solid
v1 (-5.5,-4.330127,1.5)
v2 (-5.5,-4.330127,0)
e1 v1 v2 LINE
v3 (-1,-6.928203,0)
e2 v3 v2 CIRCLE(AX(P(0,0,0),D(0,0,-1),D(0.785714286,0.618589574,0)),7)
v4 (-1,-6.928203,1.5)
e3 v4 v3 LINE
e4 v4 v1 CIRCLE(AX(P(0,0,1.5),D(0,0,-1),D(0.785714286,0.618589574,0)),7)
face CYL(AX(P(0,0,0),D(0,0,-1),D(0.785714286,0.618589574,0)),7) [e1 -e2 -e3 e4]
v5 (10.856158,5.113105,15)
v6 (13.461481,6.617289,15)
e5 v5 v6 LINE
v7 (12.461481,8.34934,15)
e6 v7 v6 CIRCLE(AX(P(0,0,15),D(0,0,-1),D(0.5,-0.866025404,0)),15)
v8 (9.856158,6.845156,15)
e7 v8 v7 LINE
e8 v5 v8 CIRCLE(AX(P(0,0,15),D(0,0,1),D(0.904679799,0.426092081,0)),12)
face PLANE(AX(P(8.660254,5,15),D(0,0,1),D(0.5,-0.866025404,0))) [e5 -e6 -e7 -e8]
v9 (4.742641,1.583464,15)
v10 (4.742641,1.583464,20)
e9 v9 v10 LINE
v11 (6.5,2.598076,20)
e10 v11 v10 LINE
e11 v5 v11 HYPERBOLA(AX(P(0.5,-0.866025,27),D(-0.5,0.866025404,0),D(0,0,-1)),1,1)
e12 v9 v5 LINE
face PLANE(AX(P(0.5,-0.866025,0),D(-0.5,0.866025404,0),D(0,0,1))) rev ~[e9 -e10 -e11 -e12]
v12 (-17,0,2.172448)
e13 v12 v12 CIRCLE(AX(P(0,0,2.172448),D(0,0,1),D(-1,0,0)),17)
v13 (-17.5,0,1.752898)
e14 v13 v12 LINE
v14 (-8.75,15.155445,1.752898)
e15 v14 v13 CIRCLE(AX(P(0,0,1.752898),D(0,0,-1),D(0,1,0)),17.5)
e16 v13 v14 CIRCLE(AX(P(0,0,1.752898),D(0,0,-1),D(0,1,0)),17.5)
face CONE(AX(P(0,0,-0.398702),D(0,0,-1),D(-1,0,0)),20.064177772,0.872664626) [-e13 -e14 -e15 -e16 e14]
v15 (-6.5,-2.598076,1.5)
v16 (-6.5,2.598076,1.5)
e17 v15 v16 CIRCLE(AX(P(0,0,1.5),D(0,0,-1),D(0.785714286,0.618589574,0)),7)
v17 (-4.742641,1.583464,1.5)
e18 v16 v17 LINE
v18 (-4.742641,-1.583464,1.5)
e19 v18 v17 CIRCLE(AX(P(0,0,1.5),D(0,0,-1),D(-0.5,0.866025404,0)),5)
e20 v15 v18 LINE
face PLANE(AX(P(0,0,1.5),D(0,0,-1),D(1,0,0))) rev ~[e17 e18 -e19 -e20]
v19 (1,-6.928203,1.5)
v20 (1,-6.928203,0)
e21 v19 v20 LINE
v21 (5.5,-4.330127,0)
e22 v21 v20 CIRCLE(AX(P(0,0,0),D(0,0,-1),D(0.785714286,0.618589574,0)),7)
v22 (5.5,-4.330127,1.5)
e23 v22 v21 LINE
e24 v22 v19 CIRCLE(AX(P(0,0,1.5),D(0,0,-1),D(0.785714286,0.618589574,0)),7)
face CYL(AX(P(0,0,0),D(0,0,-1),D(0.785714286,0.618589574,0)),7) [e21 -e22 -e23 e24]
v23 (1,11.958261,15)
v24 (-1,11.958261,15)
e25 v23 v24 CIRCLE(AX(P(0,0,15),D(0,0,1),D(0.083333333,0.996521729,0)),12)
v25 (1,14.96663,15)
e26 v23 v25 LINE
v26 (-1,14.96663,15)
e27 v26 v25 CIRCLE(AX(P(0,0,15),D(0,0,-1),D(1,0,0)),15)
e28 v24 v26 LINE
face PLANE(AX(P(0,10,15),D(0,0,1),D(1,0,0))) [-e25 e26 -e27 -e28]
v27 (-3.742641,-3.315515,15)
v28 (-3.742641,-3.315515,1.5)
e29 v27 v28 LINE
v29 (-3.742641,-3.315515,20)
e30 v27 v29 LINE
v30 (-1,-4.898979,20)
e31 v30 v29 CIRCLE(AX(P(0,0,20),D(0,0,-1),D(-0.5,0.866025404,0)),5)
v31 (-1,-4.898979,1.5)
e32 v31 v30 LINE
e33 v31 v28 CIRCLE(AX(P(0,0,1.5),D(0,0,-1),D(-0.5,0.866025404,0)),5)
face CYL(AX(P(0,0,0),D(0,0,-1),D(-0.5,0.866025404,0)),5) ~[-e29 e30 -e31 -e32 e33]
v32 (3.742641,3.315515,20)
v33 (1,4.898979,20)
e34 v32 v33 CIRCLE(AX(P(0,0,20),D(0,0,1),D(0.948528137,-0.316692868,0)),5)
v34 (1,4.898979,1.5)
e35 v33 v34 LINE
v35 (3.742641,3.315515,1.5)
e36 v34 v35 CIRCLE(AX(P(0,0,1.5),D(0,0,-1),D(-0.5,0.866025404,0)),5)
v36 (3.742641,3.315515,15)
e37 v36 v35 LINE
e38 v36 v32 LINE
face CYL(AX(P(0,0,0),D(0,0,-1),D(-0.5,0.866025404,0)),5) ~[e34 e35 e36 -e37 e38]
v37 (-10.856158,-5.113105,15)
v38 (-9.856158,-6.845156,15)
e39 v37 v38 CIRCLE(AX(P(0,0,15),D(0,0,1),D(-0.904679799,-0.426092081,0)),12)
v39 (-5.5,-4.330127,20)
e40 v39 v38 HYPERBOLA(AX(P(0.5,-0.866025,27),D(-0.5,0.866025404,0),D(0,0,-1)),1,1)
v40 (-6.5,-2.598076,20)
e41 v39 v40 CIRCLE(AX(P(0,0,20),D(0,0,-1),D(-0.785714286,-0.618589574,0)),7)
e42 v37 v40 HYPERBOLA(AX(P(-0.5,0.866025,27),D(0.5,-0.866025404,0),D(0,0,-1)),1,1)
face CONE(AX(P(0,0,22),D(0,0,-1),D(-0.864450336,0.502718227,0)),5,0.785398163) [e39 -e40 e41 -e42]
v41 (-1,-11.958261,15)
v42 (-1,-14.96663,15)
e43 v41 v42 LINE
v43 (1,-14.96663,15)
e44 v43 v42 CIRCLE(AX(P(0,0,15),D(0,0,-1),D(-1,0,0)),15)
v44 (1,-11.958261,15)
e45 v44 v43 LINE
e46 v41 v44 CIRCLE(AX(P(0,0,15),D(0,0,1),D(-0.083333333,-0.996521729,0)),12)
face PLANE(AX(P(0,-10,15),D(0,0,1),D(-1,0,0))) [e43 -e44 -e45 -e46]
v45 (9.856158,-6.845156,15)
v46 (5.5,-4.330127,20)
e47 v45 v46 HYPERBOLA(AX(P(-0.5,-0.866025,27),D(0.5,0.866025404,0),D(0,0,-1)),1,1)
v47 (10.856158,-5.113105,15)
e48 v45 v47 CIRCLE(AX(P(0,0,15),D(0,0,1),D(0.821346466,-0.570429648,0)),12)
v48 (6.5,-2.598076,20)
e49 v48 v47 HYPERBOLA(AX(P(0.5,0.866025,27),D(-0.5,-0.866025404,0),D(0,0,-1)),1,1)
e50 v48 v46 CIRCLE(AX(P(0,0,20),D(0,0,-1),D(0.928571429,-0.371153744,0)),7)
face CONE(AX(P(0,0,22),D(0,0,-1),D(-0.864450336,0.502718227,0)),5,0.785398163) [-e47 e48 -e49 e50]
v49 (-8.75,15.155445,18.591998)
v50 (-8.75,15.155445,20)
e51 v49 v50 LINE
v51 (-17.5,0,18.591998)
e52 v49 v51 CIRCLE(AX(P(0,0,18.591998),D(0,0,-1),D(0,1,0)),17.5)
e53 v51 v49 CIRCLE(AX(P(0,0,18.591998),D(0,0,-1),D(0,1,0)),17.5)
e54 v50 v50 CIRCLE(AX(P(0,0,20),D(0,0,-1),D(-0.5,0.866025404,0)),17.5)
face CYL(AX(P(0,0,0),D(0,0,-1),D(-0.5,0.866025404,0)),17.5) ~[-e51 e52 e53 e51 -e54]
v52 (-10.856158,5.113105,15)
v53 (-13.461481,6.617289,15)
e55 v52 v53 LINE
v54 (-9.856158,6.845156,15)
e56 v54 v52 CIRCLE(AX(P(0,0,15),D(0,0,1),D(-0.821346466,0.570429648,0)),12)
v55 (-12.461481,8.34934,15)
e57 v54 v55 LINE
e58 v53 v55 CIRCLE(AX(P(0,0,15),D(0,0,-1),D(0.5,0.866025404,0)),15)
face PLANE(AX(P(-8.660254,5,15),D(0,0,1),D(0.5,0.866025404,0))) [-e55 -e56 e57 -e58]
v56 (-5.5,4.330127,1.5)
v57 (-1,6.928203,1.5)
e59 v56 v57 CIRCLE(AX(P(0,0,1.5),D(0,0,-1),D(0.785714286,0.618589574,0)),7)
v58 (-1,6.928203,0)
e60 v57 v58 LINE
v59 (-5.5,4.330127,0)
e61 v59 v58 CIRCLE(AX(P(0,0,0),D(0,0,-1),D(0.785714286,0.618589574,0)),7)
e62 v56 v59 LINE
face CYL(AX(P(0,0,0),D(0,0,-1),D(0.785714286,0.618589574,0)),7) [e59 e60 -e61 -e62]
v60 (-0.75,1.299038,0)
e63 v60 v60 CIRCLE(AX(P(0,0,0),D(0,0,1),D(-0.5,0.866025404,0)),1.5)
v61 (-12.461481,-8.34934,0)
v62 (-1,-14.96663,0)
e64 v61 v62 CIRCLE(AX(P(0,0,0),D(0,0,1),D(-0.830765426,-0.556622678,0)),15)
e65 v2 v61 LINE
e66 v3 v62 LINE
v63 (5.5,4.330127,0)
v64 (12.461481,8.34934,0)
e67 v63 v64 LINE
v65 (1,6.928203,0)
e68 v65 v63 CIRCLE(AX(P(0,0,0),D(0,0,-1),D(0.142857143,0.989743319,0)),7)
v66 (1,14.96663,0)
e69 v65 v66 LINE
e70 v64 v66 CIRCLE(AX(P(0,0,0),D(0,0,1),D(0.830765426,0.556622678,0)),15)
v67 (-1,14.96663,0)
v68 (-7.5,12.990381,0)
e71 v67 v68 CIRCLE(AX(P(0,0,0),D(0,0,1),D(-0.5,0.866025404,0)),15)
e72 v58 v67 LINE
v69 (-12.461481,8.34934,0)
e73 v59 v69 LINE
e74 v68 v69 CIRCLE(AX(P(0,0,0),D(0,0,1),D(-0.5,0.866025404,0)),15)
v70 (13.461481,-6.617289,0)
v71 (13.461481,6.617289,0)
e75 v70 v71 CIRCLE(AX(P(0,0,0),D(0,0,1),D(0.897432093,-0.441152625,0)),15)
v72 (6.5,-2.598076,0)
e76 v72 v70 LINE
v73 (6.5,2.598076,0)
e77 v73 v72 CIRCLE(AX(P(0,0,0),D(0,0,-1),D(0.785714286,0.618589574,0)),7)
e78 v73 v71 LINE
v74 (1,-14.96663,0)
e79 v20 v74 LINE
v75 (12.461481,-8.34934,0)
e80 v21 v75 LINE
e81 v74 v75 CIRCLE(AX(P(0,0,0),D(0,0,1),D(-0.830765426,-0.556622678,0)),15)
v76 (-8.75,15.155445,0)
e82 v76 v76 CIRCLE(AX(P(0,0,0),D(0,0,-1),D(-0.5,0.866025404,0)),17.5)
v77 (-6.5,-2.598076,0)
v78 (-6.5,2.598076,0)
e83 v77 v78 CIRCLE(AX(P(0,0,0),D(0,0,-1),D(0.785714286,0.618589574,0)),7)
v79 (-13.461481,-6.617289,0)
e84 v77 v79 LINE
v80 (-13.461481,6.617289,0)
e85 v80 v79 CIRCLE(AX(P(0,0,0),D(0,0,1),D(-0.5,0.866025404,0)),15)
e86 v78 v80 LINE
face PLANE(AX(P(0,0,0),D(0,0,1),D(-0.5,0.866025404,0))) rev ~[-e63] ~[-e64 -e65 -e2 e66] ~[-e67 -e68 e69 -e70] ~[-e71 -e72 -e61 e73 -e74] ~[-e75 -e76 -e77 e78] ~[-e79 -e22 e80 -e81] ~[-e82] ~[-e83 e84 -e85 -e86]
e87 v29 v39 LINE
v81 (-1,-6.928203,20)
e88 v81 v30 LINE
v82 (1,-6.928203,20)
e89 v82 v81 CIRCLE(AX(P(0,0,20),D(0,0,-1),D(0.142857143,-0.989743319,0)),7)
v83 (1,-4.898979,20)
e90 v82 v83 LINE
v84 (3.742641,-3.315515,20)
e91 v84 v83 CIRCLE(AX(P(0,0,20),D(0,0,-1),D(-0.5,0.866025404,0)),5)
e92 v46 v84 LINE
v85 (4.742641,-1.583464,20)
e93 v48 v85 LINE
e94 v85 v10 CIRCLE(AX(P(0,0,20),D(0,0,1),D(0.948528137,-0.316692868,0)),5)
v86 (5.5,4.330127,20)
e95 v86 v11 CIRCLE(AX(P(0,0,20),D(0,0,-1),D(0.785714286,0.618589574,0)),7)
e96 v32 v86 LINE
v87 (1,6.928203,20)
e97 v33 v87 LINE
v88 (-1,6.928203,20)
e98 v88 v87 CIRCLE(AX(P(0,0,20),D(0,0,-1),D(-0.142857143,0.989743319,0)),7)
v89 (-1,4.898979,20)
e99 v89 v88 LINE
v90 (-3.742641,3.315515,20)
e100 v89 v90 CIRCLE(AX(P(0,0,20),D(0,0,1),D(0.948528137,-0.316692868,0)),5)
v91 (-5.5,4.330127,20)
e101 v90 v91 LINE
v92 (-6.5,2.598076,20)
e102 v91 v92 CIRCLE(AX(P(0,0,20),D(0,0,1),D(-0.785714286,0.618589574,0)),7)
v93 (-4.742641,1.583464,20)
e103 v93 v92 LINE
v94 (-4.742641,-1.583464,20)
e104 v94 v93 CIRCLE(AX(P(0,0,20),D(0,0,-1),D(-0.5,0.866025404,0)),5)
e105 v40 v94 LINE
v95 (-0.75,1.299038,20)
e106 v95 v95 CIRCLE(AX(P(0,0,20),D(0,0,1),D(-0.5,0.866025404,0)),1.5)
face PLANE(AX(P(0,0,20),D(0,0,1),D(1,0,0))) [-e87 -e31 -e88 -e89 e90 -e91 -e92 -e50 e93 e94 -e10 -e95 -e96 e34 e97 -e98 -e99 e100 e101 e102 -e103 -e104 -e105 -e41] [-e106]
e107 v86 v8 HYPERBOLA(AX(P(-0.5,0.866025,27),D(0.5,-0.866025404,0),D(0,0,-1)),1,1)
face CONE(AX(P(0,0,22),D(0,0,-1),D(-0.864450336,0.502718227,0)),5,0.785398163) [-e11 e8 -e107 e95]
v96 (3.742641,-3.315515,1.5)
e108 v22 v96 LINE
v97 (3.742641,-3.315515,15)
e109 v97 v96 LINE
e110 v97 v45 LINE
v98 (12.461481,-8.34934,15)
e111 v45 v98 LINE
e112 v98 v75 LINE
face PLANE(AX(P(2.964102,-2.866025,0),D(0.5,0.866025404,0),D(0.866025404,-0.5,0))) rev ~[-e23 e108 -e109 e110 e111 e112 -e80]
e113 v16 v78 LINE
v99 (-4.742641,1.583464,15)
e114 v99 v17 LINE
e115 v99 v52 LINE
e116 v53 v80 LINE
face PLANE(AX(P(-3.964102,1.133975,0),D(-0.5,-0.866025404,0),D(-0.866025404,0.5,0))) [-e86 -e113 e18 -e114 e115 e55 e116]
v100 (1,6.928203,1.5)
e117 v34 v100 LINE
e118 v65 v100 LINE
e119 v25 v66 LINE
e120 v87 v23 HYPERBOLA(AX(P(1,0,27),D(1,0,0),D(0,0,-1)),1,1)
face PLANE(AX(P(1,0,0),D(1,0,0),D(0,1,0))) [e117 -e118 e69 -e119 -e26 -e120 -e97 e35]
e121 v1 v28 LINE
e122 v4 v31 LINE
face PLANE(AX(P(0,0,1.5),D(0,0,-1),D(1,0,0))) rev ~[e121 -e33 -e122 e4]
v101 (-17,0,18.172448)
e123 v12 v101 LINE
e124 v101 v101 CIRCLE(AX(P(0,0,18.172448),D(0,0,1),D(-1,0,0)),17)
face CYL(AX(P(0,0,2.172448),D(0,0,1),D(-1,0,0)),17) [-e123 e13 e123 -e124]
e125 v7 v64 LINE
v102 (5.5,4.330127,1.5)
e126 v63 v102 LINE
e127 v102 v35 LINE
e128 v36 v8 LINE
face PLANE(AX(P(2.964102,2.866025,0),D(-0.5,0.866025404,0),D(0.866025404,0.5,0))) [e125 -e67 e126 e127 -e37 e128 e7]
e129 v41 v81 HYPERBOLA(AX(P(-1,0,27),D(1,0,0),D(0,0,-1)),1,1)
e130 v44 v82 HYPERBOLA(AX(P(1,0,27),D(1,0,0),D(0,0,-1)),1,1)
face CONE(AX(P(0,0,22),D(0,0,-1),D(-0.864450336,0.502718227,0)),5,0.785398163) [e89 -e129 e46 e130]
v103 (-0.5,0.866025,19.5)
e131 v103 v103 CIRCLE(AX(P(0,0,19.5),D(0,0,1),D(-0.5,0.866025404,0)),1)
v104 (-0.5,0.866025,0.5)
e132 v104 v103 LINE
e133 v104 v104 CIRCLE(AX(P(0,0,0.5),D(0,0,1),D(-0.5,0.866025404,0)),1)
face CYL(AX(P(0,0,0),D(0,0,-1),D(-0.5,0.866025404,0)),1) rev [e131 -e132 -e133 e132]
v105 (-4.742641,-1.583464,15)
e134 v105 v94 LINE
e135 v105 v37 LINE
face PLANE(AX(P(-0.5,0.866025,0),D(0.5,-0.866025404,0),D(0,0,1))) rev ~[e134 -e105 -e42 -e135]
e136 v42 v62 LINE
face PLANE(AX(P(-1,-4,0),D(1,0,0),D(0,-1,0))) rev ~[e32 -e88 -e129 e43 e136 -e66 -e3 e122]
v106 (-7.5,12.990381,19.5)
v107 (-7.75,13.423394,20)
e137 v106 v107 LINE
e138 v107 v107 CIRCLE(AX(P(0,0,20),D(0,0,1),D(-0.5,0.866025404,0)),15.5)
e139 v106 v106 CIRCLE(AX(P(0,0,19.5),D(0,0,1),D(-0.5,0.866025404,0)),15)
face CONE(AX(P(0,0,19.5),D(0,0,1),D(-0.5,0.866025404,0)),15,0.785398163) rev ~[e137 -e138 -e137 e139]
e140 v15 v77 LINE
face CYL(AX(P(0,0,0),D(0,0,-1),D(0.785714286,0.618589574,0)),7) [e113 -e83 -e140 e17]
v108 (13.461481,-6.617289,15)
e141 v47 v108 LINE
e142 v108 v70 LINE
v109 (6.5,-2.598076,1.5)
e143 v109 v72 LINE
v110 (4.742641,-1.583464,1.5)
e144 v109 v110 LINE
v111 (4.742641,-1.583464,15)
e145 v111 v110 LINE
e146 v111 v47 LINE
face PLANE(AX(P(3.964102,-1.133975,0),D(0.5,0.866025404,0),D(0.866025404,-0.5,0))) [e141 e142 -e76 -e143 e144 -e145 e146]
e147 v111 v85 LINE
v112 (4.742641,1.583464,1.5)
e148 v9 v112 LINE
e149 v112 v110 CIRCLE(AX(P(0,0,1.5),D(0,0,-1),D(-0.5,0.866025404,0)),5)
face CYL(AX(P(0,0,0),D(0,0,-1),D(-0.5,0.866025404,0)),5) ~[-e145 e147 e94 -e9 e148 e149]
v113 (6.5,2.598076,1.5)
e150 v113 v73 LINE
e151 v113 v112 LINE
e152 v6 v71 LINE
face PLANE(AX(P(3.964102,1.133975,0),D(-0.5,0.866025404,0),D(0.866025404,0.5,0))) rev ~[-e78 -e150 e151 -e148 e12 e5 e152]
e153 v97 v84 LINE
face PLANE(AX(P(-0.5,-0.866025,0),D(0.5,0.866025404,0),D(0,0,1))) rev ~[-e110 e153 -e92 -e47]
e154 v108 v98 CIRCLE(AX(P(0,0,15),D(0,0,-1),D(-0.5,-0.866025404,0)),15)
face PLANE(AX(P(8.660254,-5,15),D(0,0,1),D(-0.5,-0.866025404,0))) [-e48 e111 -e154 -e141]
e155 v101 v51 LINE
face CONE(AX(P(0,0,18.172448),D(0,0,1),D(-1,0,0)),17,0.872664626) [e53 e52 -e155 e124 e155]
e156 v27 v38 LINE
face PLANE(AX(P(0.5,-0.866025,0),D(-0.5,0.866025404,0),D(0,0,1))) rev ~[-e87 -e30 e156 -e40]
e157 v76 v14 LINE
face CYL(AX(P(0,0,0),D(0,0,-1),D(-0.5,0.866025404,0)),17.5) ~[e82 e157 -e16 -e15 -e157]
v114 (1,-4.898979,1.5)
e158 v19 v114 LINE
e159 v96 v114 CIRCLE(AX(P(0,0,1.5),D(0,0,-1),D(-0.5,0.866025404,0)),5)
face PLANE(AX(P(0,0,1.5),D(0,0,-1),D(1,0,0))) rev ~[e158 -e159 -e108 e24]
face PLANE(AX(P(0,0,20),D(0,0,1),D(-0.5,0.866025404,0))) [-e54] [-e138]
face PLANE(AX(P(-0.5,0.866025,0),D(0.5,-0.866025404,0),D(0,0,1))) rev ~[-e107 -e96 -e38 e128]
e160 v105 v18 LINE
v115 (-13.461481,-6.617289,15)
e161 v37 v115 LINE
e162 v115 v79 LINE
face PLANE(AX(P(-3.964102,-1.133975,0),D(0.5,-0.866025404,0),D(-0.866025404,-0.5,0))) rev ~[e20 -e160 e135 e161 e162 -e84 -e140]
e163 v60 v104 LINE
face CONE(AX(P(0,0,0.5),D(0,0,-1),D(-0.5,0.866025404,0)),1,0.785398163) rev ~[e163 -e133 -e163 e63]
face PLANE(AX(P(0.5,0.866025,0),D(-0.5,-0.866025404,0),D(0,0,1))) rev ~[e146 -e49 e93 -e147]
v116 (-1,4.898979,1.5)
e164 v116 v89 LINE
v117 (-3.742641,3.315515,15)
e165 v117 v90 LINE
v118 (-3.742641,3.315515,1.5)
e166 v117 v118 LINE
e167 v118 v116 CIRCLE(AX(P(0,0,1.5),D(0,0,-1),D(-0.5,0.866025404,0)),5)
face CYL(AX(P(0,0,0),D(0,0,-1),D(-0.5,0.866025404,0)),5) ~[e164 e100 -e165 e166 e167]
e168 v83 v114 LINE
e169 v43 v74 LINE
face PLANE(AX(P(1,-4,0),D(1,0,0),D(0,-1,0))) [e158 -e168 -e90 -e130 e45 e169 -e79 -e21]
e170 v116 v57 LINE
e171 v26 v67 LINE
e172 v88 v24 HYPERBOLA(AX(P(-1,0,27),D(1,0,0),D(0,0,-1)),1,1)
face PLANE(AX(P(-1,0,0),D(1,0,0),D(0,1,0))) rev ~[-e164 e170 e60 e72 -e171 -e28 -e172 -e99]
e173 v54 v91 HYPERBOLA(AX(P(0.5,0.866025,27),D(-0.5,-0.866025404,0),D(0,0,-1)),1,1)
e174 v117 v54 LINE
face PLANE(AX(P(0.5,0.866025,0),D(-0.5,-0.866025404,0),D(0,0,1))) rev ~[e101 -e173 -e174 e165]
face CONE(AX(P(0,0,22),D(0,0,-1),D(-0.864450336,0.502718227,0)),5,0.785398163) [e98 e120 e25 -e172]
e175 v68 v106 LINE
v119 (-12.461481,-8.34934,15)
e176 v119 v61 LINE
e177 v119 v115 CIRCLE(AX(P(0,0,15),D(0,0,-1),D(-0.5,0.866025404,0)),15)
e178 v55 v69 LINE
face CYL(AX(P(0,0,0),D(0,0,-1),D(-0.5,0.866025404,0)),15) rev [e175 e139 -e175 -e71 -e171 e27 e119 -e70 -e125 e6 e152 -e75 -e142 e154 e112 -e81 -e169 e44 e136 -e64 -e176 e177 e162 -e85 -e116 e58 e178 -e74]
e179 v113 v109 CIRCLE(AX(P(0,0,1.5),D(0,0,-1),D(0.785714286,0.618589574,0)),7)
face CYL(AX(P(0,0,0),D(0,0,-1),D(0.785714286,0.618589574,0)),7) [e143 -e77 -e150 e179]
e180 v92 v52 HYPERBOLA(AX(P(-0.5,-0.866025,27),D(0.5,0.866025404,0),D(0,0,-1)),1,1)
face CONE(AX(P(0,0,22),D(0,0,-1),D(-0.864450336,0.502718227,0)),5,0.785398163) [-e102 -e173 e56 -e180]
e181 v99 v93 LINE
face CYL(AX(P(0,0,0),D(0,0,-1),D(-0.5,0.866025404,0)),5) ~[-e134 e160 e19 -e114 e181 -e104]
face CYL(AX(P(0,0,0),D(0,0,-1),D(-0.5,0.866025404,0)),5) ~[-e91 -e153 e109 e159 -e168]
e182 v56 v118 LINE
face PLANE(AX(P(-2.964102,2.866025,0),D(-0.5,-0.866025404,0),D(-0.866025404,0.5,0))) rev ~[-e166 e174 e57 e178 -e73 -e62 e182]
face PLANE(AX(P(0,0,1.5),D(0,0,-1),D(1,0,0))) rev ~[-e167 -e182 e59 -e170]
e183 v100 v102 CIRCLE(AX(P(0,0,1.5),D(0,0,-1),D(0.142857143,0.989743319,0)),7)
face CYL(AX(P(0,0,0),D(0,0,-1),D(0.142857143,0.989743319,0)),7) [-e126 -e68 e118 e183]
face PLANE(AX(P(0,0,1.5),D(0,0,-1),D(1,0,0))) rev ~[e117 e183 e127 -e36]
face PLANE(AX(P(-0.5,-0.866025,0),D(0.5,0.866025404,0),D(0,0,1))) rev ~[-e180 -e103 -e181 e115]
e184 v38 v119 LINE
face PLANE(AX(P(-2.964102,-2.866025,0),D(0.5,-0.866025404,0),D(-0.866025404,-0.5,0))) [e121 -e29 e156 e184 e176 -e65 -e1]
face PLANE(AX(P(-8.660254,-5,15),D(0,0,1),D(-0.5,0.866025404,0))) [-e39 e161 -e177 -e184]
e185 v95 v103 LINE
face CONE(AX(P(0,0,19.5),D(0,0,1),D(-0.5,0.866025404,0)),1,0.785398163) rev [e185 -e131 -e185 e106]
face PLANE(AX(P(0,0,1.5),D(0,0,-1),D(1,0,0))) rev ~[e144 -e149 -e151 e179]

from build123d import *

# Parameters (mm, degrees)
F0_R          = 5
F0_R_2        = 1
F1_DEPTH      = 20
F0_R_3        = 17.5
F0_R_4        = 15
F2_W          = 2
F2_H          = 12
F3_DEPTH      = 15
F4_COUNT      = 6
F6_T4_ANGLE   = 359.64
F6_T11_ANGLE  = 359.64
F6_T18_ANGLE  = 359.64
F6_T25_ANGLE  = 359.64
F6_T32_ANGLE  = 359.64
F6_T39_ANGLE  = 359.64
F6_T46_ANGLE  = 359.64
F6_T53_ANGLE  = 359.64
F6_T60_ANGLE  = 359.64
F6_T67_ANGLE  = 359.64
F6_T74_ANGLE  = 359.64
F6_T81_ANGLE  = 359.64
F6_T88_ANGLE  = 359.64
F6_T95_ANGLE  = 359.64
F6_T102_ANGLE = 359.64
F6_T109_ANGLE = 359.64
F6_T116_ANGLE = 359.64
F6_T123_ANGLE = 359.64
F9_SIZE       = 0.5
F10_R         = 7
F10_R_2       = 3.5
F11_DEPTH     = 1.5
F12_SIZE      = 0.5


# Not quite as in the source:
# - a fillet or chamfer that OpenCascade refuses, or shapes differently, is made with other operations: its cross-section is extruded or revolved along the edge and cut away or added


with BuildPart() as f1:
    # F0 (on Top) → F1 (new body)
    with BuildSketch(Plane.XY):
        Circle(F0_R)
        Circle(F0_R_2, mode=Mode.SUBTRACT)
    extrude(amount=F1_DEPTH)



with BuildPart() as f1b:
    # F0 (on Top) → F1, piece 2 (new body)
    with BuildSketch(Plane.XY):
        Circle(F0_R_3)
        Circle(F0_R_4, mode=Mode.SUBTRACT)
    extrude(amount=F1_DEPTH)


with BuildPart() as f1_1:
    add(f1.part)

    add(f1b.part)  # F3 merges F1b
    # F2 (on Top) → F3 (join)
    with BuildSketch(Plane.XY):
        with Locations((0, 10)):
            Rectangle(F2_W, F2_H)
    extrude(amount=F3_DEPTH)


with BuildPart() as f4_1:
    # F4: instance of F1
    add(f1_1.part.rotate(Axis((0, 0, 0), (0, 0, -1)), 1 * 360 / F4_COUNT))


with BuildPart() as f4_2:
    # F4: instance of F1
    add(f1_1.part.rotate(Axis((0, 0, 0), (0, 0, -1)), 2 * 360 / F4_COUNT))


with BuildPart() as f4_3:
    # F4: instance of F1
    add(f1_1.part.rotate(Axis((0, 0, 0), (0, 0, -1)), 3 * 360 / F4_COUNT))


with BuildPart() as f4_4:
    # F4: instance of F1
    add(f1_1.part.rotate(Axis((0, 0, 0), (0, 0, -1)), 4 * 360 / F4_COUNT))


with BuildPart() as f4_5:
    # F4: instance of F1
    add(f1_1.part.rotate(Axis((0, 0, 0), (0, 0, -1)), 5 * 360 / F4_COUNT))


with BuildPart() as f4_4_1:
    add(f4_4.part)

    # F5: union F4_1, F4_2, F4_3, F1, F4_5
    add(f4_1.part)
    add(f4_2.part)
    add(f4_3.part)
    add(f1_1.part)
    add(f4_5.part)

    # F6: chamfer of 7 on 6 edges, made by hand


with BuildPart() as f6_tool2:
    # F6_s3 → F6_t4 (revolve)
    with BuildSketch(Plane(origin=(0, 0, 0), x_dir=(0, 0, 1), z_dir=(-0.5027182272, -0.8644503364, 0))):
        Polygon((22, 5), (15, 12), (15, 5), align=None)
    revolve(axis=Axis((0, 0, 15), (0, 0, -1)), revolution_arc=F6_T4_ANGLE)

    split(bisect_by=Plane(origin=(0.5, 0.8660254038, 0), x_dir=(0, 0, 1), z_dir=(-0.5, -0.8660254038, 0)), keep=Keep.TOP)

    split(bisect_by=Plane.XY.offset(20), keep=Keep.BOTTOM)

    split(bisect_by=Plane(origin=(-0.5, -0.8660254038, 0), x_dir=(0, 0, 1), z_dir=(0.5, 0.8660254038, 0)), keep=Keep.TOP)


with BuildPart() as f4_4_2:
    add(f4_4_1.part)

    # F6_t1: union F6_tool2
    add(f6_tool2.part)


with BuildPart() as f6_tool9:
    # F6_s10 → F6_t11 (revolve)
    with BuildSketch(Plane(origin=(0, 0, 0), x_dir=(0, 0, 1), z_dir=(-0.5027182272, -0.8644503364, 0))):
        Polygon((22, 5), (15, 12), (15, 5), align=None)
    revolve(axis=Axis((0, 0, 15), (0, 0, -1)), revolution_arc=F6_T11_ANGLE)

    split(bisect_by=Plane.XY.offset(20), keep=Keep.BOTTOM)

    split(bisect_by=Plane.YZ.offset(-1), keep=Keep.TOP)

    split(bisect_by=Plane.YZ.offset(1), keep=Keep.BOTTOM)


with BuildPart() as f4_4_3:
    add(f4_4_2.part)

    # F6_t8: union F6_tool9
    add(f6_tool9.part)


with BuildPart() as f6_tool16:
    # F6_s17 → F6_t18 (revolve)
    with BuildSketch(Plane(origin=(0, 0, 0), x_dir=(0, 0, 1), z_dir=(-0.5027182272, -0.8644503364, 0))):
        Polygon((22, 5), (15, 12), (15, 5), align=None)
    revolve(axis=Axis((0, 0, 15), (0, 0, -1)), revolution_arc=F6_T18_ANGLE)

    split(bisect_by=Plane.XY.offset(20), keep=Keep.BOTTOM)

    split(bisect_by=Plane(origin=(-0.5, 0.8660254038, 0), x_dir=(0, 0, 1), z_dir=(0.5, -0.8660254038, 0)), keep=Keep.TOP)

    split(bisect_by=Plane(origin=(0.5, -0.8660254038, 0), x_dir=(0, 0, 1), z_dir=(-0.5, 0.8660254038, 0)), keep=Keep.TOP)


with BuildPart() as f4_4_4:
    add(f4_4_3.part)

    # F6_t15: union F6_tool16
    add(f6_tool16.part)


with BuildPart() as f6_tool23:
    # F6_s24 → F6_t25 (revolve)
    with BuildSketch(Plane(origin=(0, 0, 0), x_dir=(0, 0, 1), z_dir=(0.497276838, -0.8675919239, 0))):
        Polygon((22, 5), (15, 12), (15, 5), align=None)
    revolve(axis=Axis((0, 0, 15), (0, 0, -1)), revolution_arc=F6_T25_ANGLE)

    split(bisect_by=Plane.XY.offset(20), keep=Keep.BOTTOM)

    split(bisect_by=Plane(origin=(-0.5, 0.8660254038, 0), x_dir=(0, 0, 1), z_dir=(0.5, -0.8660254038, 0)), keep=Keep.TOP)

    split(bisect_by=Plane(origin=(0.5, -0.8660254038, 0), x_dir=(0, 0, 1), z_dir=(-0.5, 0.8660254038, 0)), keep=Keep.TOP)


with BuildPart() as f4_4_5:
    add(f4_4_4.part)

    # F6_t22: union F6_tool23
    add(f6_tool23.part)


with BuildPart() as f6_tool30:
    # F6_s31 → F6_t32 (revolve)
    with BuildSketch(Plane(origin=(0, 0, 0), x_dir=(0, 0, 1), z_dir=(0.497276838, -0.8675919239, 0))):
        Polygon((22, 5), (15, 12), (15, 5), align=None)
    revolve(axis=Axis((0, 0, 15), (0, 0, -1)), revolution_arc=F6_T32_ANGLE)

    split(bisect_by=Plane(origin=(0.5, 0.8660254038, 0), x_dir=(0, 0, 1), z_dir=(-0.5, -0.8660254038, 0)), keep=Keep.TOP)

    split(bisect_by=Plane.XY.offset(20), keep=Keep.BOTTOM)

    split(bisect_by=Plane(origin=(-0.5, -0.8660254038, 0), x_dir=(0, 0, 1), z_dir=(0.5, 0.8660254038, 0)), keep=Keep.TOP)


with BuildPart() as f4_4_6:
    add(f4_4_5.part)

    # F6_t29: union F6_tool30
    add(f6_tool30.part)


with BuildPart() as f6_tool37:
    # F6_s38 → F6_t39 (revolve)
    with BuildSketch(Plane(origin=(0, 0, 0), x_dir=(0, 0, 1), z_dir=(0.497276838, -0.8675919239, 0))):
        Polygon((22, 5), (15, 12), (15, 5), align=None)
    revolve(axis=Axis((0, 0, 15), (0, 0, -1)), revolution_arc=F6_T39_ANGLE)

    split(bisect_by=Plane.XY.offset(20), keep=Keep.BOTTOM)

    split(bisect_by=Plane.YZ.offset(-1), keep=Keep.TOP)

    split(bisect_by=Plane.YZ.offset(1), keep=Keep.BOTTOM)


with BuildPart() as f4_4_7:
    add(f4_4_6.part)

    # F6_t36: union F6_tool37
    add(f6_tool37.part)


with BuildPart() as f6_tool44:
    # F6_s45 → F6_t46 (revolve)
    with BuildSketch(Plane(origin=(0, 0, 0), x_dir=(0, 0, 1), z_dir=(0.9999950652, -0.0031415875, 0))):
        Polygon((22, 5), (15, 12), (15, 5), align=None)
    revolve(axis=Axis((0, 0, 15), (0, 0, -1)), revolution_arc=F6_T46_ANGLE)

    split(bisect_by=Plane.XY.offset(20), keep=Keep.BOTTOM)

    split(bisect_by=Plane.YZ.offset(-1), keep=Keep.TOP)

    split(bisect_by=Plane.YZ.offset(1), keep=Keep.BOTTOM)


with BuildPart() as f4_4_8:
    add(f4_4_7.part)

    # F6_t43: union F6_tool44
    add(f6_tool44.part)


with BuildPart() as f6_tool51:
    # F6_s52 → F6_t53 (revolve)
    with BuildSketch(Plane(origin=(0, 0, 0), x_dir=(0, 0, 1), z_dir=(0.9999950652, -0.0031415875, 0))):
        Polygon((22, 5), (15, 12), (15, 5), align=None)
    revolve(axis=Axis((0, 0, 15), (0, 0, -1)), revolution_arc=F6_T53_ANGLE)

    split(bisect_by=Plane.XY.offset(20), keep=Keep.BOTTOM)

    split(bisect_by=Plane(origin=(-0.5, 0.8660254038, 0), x_dir=(0, 0, 1), z_dir=(0.5, -0.8660254038, 0)), keep=Keep.TOP)

    split(bisect_by=Plane(origin=(0.5, -0.8660254038, 0), x_dir=(0, 0, 1), z_dir=(-0.5, 0.8660254038, 0)), keep=Keep.TOP)


with BuildPart() as f4_4_9:
    add(f4_4_8.part)

    # F6_t50: union F6_tool51
    add(f6_tool51.part)


with BuildPart() as f6_tool58:
    # F6_s59 → F6_t60 (revolve)
    with BuildSketch(Plane(origin=(0, 0, 0), x_dir=(0, 0, 1), z_dir=(0.9999950652, -0.0031415875, 0))):
        Polygon((22, 5), (15, 12), (15, 5), align=None)
    revolve(axis=Axis((0, 0, 15), (0, 0, -1)), revolution_arc=F6_T60_ANGLE)

    split(bisect_by=Plane(origin=(0.5, 0.8660254038, 0), x_dir=(0, 0, 1), z_dir=(-0.5, -0.8660254038, 0)), keep=Keep.TOP)

    split(bisect_by=Plane.XY.offset(20), keep=Keep.BOTTOM)

    split(bisect_by=Plane(origin=(-0.5, -0.8660254038, 0), x_dir=(0, 0, 1), z_dir=(0.5, 0.8660254038, 0)), keep=Keep.TOP)


with BuildPart() as f4_4_10:
    add(f4_4_9.part)

    # F6_t57: union F6_tool58
    add(f6_tool58.part)


with BuildPart() as f6_tool65:
    # F6_s66 → F6_t67 (revolve)
    with BuildSketch(Plane(origin=(0, 0, 0), x_dir=(0, 0, 1), z_dir=(0.5027182272, 0.8644503364, 0))):
        Polygon((22, 5), (15, 12), (15, 5), align=None)
    revolve(axis=Axis((0, 0, 15), (0, 0, -1)), revolution_arc=F6_T67_ANGLE)

    split(bisect_by=Plane(origin=(0.5, 0.8660254038, 0), x_dir=(0, 0, 1), z_dir=(-0.5, -0.8660254038, 0)), keep=Keep.TOP)

    split(bisect_by=Plane.XY.offset(20), keep=Keep.BOTTOM)

    split(bisect_by=Plane(origin=(-0.5, -0.8660254038, 0), x_dir=(0, 0, 1), z_dir=(0.5, 0.8660254038, 0)), keep=Keep.TOP)


with BuildPart() as f4_4_11:
    add(f4_4_10.part)

    # F6_t64: union F6_tool65
    add(f6_tool65.part)


with BuildPart() as f6_tool72:
    # F6_s73 → F6_t74 (revolve)
    with BuildSketch(Plane(origin=(0, 0, 0), x_dir=(0, 0, 1), z_dir=(0.5027182272, 0.8644503364, 0))):
        Polygon((22, 5), (15, 12), (15, 5), align=None)
    revolve(axis=Axis((0, 0, 15), (0, 0, -1)), revolution_arc=F6_T74_ANGLE)

    split(bisect_by=Plane.XY.offset(20), keep=Keep.BOTTOM)

    split(bisect_by=Plane.YZ.offset(-1), keep=Keep.TOP)

    split(bisect_by=Plane.YZ.offset(1), keep=Keep.BOTTOM)


with BuildPart() as f4_4_12:
    add(f4_4_11.part)

    # F6_t71: union F6_tool72
    add(f6_tool72.part)


with BuildPart() as f6_tool79:
    # F6_s80 → F6_t81 (revolve)
    with BuildSketch(Plane(origin=(0, 0, 0), x_dir=(0, 0, 1), z_dir=(0.5027182272, 0.8644503364, 0))):
        Polygon((22, 5), (15, 12), (15, 5), align=None)
    revolve(axis=Axis((0, 0, 15), (0, 0, -1)), revolution_arc=F6_T81_ANGLE)

    split(bisect_by=Plane.XY.offset(20), keep=Keep.BOTTOM)

    split(bisect_by=Plane(origin=(-0.5, 0.8660254038, 0), x_dir=(0, 0, 1), z_dir=(0.5, -0.8660254038, 0)), keep=Keep.TOP)

    split(bisect_by=Plane(origin=(0.5, -0.8660254038, 0), x_dir=(0, 0, 1), z_dir=(-0.5, 0.8660254038, 0)), keep=Keep.TOP)


with BuildPart() as f4_4_13:
    add(f4_4_12.part)

    # F6_t78: union F6_tool79
    add(f6_tool79.part)


with BuildPart() as f6_tool86:
    # F6_s87 → F6_t88 (revolve)
    with BuildSketch(Plane(origin=(0, 0, 0), x_dir=(0, 0, 1), z_dir=(-0.497276838, 0.8675919239, 0))):
        Polygon((22, 5), (15, 12), (15, 5), align=None)
    revolve(axis=Axis((0, 0, 15), (0, 0, -1)), revolution_arc=F6_T88_ANGLE)

    split(bisect_by=Plane.XY.offset(20), keep=Keep.BOTTOM)

    split(bisect_by=Plane(origin=(-0.5, 0.8660254038, 0), x_dir=(0, 0, 1), z_dir=(0.5, -0.8660254038, 0)), keep=Keep.TOP)

    split(bisect_by=Plane(origin=(0.5, -0.8660254038, 0), x_dir=(0, 0, 1), z_dir=(-0.5, 0.8660254038, 0)), keep=Keep.TOP)


with BuildPart() as f4_4_14:
    add(f4_4_13.part)

    # F6_t85: union F6_tool86
    add(f6_tool86.part)


with BuildPart() as f6_tool93:
    # F6_s94 → F6_t95 (revolve)
    with BuildSketch(Plane(origin=(0, 0, 0), x_dir=(0, 0, 1), z_dir=(-0.497276838, 0.8675919239, 0))):
        Polygon((22, 5), (15, 12), (15, 5), align=None)
    revolve(axis=Axis((0, 0, 15), (0, 0, -1)), revolution_arc=F6_T95_ANGLE)

    split(bisect_by=Plane(origin=(0.5, 0.8660254038, 0), x_dir=(0, 0, 1), z_dir=(-0.5, -0.8660254038, 0)), keep=Keep.TOP)

    split(bisect_by=Plane.XY.offset(20), keep=Keep.BOTTOM)

    split(bisect_by=Plane(origin=(-0.5, -0.8660254038, 0), x_dir=(0, 0, 1), z_dir=(0.5, 0.8660254038, 0)), keep=Keep.TOP)


with BuildPart() as f4_4_15:
    add(f4_4_14.part)

    # F6_t92: union F6_tool93
    add(f6_tool93.part)


with BuildPart() as f6_tool100:
    # F6_s101 → F6_t102 (revolve)
    with BuildSketch(Plane(origin=(0, 0, 0), x_dir=(0, 0, 1), z_dir=(-0.497276838, 0.8675919239, 0))):
        Polygon((22, 5), (15, 12), (15, 5), align=None)
    revolve(axis=Axis((0, 0, 15), (0, 0, -1)), revolution_arc=F6_T102_ANGLE)

    split(bisect_by=Plane.XY.offset(20), keep=Keep.BOTTOM)

    split(bisect_by=Plane.YZ.offset(-1), keep=Keep.TOP)

    split(bisect_by=Plane.YZ.offset(1), keep=Keep.BOTTOM)


with BuildPart() as f4_4_16:
    add(f4_4_15.part)

    # F6_t99: union F6_tool100
    add(f6_tool100.part)


with BuildPart() as f6_tool107:
    # F6_s108 → F6_t109 (revolve)
    with BuildSketch(Plane(origin=(0, 0, 0), x_dir=(0, 0, 1), z_dir=(-0.9999950652, 0.0031415875, 0))):
        Polygon((22, 5), (15, 12), (15, 5), align=None)
    revolve(axis=Axis((0, 0, 15), (0, 0, -1)), revolution_arc=F6_T109_ANGLE)

    split(bisect_by=Plane.XY.offset(20), keep=Keep.BOTTOM)

    split(bisect_by=Plane.YZ.offset(-1), keep=Keep.TOP)

    split(bisect_by=Plane.YZ.offset(1), keep=Keep.BOTTOM)


with BuildPart() as f4_4_17:
    add(f4_4_16.part)

    # F6_t106: union F6_tool107
    add(f6_tool107.part)


with BuildPart() as f6_tool114:
    # F6_s115 → F6_t116 (revolve)
    with BuildSketch(Plane(origin=(0, 0, 0), x_dir=(0, 0, 1), z_dir=(-0.9999950652, 0.0031415875, 0))):
        Polygon((22, 5), (15, 12), (15, 5), align=None)
    revolve(axis=Axis((0, 0, 15), (0, 0, -1)), revolution_arc=F6_T116_ANGLE)

    split(bisect_by=Plane.XY.offset(20), keep=Keep.BOTTOM)

    split(bisect_by=Plane(origin=(-0.5, 0.8660254038, 0), x_dir=(0, 0, 1), z_dir=(0.5, -0.8660254038, 0)), keep=Keep.TOP)

    split(bisect_by=Plane(origin=(0.5, -0.8660254038, 0), x_dir=(0, 0, 1), z_dir=(-0.5, 0.8660254038, 0)), keep=Keep.TOP)


with BuildPart() as f4_4_18:
    add(f4_4_17.part)

    # F6_t113: union F6_tool114
    add(f6_tool114.part)


with BuildPart() as f6_tool121:
    # F6_s122 → F6_t123 (revolve)
    with BuildSketch(Plane(origin=(0, 0, 0), x_dir=(0, 0, 1), z_dir=(-0.9999950652, 0.0031415875, 0))):
        Polygon((22, 5), (15, 12), (15, 5), align=None)
    revolve(axis=Axis((0, 0, 15), (0, 0, -1)), revolution_arc=F6_T123_ANGLE)

    split(bisect_by=Plane(origin=(0.5, 0.8660254038, 0), x_dir=(0, 0, 1), z_dir=(-0.5, -0.8660254038, 0)), keep=Keep.TOP)

    split(bisect_by=Plane.XY.offset(20), keep=Keep.BOTTOM)

    split(bisect_by=Plane(origin=(-0.5, -0.8660254038, 0), x_dir=(0, 0, 1), z_dir=(0.5, 0.8660254038, 0)), keep=Keep.TOP)


with BuildPart() as f4_4_19:
    add(f4_4_18.part)

    # F6_t120: union F6_tool121
    add(f6_tool121.part)

    # F7 (on Front) → F8 (revolve, cut)
    with BuildSketch(Plane.XZ):
        Polygon((-17, 18.1724479471), (-20.0641777725, 20.7435983859), (-20.0641777725, -0.3987024916), (-17, 2.1724479471), align=None)
    revolve(axis=Axis((0, 0, 20), (0, 0, 1)), mode=Mode.SUBTRACT)

    # F9
    f9_edges = [f4_4_19.edges().sort_by_distance(p)[0] for p in [
        (0.5, -0.866025, 20),
        (7.5, -12.990381, 20),
    ]]
    chamfer(f9_edges, length=F9_SIZE)

    # F10 (on face) → F11 (join)
    with BuildSketch(Plane(origin=(0, 0, 0), x_dir=(1, 0, 0), z_dir=(0, 0, -1))):
        Circle(F10_R)
        Circle(F10_R_2, mode=Mode.SUBTRACT)
        with BuildLine():
            ThreePointArc((1, -6.9282032303), (3.5, -6.0621778265), (5.5, -4.3301270189))
            Line((5.5, -4.3301270189), (3.7426406871, -3.3155151466))
            ThreePointArc((3.7426406871, -3.3155151466), (2.5, -4.3301270189), (1, -4.8989794856))
            Line((1, -4.8989794856), (1, -6.9282032303))
        make_face()
    extrude(amount=-F11_DEPTH)

    # F12
    f12_edges = [f4_4_19.edges().sort_by_distance(p)[0] for p in [
        (0.5, -0.866025, 0),
    ]]
    chamfer(f12_edges, length=F12_SIZE)


solid = f4_4_19.part
